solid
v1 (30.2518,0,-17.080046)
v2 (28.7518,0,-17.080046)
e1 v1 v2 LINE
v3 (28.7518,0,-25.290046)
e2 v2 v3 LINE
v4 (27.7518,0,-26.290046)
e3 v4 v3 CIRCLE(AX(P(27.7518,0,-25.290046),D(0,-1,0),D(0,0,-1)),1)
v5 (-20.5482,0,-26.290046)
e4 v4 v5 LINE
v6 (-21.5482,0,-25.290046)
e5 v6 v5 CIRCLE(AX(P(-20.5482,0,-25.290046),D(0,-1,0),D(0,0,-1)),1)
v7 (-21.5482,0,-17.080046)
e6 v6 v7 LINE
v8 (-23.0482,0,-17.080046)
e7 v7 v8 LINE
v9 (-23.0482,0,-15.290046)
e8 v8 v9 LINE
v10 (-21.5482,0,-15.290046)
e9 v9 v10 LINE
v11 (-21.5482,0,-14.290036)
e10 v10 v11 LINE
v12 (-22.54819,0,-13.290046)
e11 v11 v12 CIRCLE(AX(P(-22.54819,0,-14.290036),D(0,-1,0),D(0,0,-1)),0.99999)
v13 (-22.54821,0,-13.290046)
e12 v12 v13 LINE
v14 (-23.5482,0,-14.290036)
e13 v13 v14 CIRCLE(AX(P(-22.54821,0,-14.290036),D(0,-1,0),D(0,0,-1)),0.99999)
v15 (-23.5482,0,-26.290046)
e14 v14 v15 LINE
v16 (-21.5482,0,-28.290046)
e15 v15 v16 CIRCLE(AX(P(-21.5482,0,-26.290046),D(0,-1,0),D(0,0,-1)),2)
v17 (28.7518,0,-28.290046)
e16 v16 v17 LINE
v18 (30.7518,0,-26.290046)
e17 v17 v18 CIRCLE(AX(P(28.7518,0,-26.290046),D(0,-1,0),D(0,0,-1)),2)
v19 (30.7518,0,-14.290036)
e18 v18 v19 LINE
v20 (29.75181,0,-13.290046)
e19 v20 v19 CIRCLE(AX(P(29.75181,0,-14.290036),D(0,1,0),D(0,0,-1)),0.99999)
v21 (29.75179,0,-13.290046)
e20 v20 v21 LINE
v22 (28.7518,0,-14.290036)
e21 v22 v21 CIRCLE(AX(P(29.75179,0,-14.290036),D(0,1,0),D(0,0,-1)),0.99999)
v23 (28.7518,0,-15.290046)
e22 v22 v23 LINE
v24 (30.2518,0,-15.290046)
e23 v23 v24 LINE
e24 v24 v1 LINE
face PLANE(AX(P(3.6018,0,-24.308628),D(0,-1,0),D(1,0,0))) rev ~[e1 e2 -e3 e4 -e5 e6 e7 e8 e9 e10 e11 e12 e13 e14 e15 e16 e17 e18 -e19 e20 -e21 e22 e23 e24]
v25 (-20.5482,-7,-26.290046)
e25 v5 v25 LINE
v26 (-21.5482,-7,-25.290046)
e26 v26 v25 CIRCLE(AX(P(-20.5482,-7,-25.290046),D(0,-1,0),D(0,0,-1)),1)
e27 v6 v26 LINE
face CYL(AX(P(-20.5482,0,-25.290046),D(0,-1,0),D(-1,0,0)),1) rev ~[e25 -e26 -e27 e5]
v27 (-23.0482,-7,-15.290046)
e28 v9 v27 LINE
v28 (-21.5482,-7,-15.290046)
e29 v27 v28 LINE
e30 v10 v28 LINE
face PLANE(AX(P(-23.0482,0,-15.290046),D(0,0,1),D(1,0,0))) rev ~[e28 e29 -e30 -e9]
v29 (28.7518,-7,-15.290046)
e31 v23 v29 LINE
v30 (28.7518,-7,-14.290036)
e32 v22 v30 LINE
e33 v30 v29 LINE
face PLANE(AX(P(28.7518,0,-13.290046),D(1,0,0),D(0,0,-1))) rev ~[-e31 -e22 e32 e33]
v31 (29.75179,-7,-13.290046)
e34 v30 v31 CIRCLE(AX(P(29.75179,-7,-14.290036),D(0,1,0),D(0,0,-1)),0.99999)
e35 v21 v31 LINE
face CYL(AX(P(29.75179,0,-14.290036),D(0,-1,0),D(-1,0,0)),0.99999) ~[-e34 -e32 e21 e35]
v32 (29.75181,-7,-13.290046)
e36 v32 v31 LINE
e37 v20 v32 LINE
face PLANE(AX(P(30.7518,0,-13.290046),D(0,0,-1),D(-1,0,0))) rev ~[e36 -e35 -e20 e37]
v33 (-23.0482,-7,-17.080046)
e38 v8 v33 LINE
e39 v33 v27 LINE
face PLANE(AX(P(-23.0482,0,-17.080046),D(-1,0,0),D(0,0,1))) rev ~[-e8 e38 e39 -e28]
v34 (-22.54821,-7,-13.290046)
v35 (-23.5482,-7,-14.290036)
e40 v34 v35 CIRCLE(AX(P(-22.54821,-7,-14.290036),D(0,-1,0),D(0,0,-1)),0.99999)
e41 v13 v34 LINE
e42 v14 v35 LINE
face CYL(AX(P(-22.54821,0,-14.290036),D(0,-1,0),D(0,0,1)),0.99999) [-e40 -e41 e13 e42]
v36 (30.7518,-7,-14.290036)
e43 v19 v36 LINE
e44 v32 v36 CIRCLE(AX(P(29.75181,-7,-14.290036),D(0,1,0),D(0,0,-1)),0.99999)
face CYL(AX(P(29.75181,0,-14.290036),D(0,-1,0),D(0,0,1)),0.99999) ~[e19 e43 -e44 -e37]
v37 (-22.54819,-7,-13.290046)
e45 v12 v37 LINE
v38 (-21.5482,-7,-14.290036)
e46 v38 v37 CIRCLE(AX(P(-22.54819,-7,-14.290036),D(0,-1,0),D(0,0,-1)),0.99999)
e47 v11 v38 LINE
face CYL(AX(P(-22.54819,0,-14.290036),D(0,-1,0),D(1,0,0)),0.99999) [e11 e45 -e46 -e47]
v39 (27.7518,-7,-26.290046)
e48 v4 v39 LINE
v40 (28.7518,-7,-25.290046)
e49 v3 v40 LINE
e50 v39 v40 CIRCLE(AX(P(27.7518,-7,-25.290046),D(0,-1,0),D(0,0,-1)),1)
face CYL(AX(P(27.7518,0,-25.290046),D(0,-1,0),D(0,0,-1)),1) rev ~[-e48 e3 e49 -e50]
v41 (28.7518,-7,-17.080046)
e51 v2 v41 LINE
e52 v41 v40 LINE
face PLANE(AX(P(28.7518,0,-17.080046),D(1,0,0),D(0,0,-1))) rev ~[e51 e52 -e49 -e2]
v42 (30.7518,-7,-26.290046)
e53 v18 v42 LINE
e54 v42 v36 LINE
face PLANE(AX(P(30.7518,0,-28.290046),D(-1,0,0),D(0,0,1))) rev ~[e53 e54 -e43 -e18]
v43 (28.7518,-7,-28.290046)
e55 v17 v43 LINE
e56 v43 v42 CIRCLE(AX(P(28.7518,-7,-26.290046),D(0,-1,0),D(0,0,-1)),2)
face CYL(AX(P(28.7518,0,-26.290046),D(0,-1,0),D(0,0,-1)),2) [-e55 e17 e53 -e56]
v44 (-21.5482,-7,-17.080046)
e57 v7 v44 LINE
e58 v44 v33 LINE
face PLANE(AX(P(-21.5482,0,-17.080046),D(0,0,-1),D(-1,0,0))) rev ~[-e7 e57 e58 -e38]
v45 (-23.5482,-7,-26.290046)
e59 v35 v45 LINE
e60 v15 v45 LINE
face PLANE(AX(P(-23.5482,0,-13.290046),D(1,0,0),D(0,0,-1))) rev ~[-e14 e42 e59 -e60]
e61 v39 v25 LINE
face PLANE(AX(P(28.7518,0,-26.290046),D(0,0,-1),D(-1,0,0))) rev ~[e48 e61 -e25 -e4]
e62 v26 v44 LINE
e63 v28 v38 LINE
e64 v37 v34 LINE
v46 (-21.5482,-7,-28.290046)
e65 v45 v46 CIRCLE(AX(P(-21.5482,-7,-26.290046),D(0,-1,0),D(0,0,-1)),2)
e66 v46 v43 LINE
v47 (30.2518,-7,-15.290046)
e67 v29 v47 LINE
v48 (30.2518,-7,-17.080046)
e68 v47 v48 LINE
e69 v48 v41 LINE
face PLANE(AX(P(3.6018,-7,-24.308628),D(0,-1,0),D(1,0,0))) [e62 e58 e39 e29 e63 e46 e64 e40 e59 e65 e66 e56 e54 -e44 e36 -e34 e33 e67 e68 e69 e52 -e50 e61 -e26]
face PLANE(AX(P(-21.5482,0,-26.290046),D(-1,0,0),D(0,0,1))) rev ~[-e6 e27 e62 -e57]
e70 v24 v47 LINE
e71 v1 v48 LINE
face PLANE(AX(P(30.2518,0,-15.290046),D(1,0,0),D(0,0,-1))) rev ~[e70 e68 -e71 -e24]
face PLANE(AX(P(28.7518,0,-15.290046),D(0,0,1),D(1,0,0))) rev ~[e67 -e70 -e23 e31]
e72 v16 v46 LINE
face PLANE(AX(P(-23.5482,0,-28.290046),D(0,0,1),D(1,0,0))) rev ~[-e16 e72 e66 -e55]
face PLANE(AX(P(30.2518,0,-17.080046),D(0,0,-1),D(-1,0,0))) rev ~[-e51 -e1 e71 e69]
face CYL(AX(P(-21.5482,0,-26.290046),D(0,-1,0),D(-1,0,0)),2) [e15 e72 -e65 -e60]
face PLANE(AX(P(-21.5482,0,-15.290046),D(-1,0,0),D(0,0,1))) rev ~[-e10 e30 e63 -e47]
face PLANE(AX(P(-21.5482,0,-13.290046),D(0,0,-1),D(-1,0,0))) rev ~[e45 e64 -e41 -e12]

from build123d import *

# Parameters (mm, degrees)
F1_DEPTH = 7
F2_R     = 2
F3_R     = 1
F4_R     = 0.99999


# Not quite as in the source:
# - a fillet or chamfer is up to 0.001 mm smaller than in the source, because OpenCascade refuses the exact size


with BuildPart() as f1:
    # F0 (on Front) → F1 (new body)
    with BuildSketch(Plane.XZ):
        Polygon((-21.5481998797, -13.2900460566), (-23.5481998797, -13.2900460566), (-23.5481998797, -28.2900460566), (30.7518001203, -28.2900460566), (30.7518001203, -13.2900460566), (28.7518001203, -13.2900460566), (28.7518001203, -15.2900460566), (30.2518001203, -15.2900460566), (30.2518001203, -17.0800460566), (28.7518001203, -17.0800460566), (28.7518001203, -26.2900460566), (-21.5481998797, -26.2900460566), (-21.5481998797, -17.0800460566), (-23.0481998797, -17.0800460566), (-23.0481998797, -15.2900460566), (-21.5481998797, -15.2900460566), align=None)
    extrude(amount=F1_DEPTH)

    # F2
    f2_edges = [f1.edges().sort_by_distance(p)[0] for p in [
        (-23.5482, -3.5, -28.290046),
        (30.7518, -3.5, -28.290046),
    ]]
    fillet(f2_edges, radius=F2_R)

    # F3
    f3_edges = [f1.edges().sort_by_distance(p)[0] for p in [
        (-21.5482, -3.5, -26.290046),
        (28.7518, -3.5, -26.290046),
    ]]
    fillet(f3_edges, radius=F3_R)

    # F4 (radius 1 in the source; OpenCascade refuses exactly that, so slightly less here)
    f4_edges = [f1.edges().sort_by_distance(p)[0] for p in [
        (-23.5482, -3.5, -13.290046),
        (30.7518, -3.5, -13.290046),
        (-21.5482, -3.5, -13.290046),
        (28.7518, -3.5, -13.290046),
    ]]
    fillet(f4_edges, radius=F4_R)


solid = f1.part
